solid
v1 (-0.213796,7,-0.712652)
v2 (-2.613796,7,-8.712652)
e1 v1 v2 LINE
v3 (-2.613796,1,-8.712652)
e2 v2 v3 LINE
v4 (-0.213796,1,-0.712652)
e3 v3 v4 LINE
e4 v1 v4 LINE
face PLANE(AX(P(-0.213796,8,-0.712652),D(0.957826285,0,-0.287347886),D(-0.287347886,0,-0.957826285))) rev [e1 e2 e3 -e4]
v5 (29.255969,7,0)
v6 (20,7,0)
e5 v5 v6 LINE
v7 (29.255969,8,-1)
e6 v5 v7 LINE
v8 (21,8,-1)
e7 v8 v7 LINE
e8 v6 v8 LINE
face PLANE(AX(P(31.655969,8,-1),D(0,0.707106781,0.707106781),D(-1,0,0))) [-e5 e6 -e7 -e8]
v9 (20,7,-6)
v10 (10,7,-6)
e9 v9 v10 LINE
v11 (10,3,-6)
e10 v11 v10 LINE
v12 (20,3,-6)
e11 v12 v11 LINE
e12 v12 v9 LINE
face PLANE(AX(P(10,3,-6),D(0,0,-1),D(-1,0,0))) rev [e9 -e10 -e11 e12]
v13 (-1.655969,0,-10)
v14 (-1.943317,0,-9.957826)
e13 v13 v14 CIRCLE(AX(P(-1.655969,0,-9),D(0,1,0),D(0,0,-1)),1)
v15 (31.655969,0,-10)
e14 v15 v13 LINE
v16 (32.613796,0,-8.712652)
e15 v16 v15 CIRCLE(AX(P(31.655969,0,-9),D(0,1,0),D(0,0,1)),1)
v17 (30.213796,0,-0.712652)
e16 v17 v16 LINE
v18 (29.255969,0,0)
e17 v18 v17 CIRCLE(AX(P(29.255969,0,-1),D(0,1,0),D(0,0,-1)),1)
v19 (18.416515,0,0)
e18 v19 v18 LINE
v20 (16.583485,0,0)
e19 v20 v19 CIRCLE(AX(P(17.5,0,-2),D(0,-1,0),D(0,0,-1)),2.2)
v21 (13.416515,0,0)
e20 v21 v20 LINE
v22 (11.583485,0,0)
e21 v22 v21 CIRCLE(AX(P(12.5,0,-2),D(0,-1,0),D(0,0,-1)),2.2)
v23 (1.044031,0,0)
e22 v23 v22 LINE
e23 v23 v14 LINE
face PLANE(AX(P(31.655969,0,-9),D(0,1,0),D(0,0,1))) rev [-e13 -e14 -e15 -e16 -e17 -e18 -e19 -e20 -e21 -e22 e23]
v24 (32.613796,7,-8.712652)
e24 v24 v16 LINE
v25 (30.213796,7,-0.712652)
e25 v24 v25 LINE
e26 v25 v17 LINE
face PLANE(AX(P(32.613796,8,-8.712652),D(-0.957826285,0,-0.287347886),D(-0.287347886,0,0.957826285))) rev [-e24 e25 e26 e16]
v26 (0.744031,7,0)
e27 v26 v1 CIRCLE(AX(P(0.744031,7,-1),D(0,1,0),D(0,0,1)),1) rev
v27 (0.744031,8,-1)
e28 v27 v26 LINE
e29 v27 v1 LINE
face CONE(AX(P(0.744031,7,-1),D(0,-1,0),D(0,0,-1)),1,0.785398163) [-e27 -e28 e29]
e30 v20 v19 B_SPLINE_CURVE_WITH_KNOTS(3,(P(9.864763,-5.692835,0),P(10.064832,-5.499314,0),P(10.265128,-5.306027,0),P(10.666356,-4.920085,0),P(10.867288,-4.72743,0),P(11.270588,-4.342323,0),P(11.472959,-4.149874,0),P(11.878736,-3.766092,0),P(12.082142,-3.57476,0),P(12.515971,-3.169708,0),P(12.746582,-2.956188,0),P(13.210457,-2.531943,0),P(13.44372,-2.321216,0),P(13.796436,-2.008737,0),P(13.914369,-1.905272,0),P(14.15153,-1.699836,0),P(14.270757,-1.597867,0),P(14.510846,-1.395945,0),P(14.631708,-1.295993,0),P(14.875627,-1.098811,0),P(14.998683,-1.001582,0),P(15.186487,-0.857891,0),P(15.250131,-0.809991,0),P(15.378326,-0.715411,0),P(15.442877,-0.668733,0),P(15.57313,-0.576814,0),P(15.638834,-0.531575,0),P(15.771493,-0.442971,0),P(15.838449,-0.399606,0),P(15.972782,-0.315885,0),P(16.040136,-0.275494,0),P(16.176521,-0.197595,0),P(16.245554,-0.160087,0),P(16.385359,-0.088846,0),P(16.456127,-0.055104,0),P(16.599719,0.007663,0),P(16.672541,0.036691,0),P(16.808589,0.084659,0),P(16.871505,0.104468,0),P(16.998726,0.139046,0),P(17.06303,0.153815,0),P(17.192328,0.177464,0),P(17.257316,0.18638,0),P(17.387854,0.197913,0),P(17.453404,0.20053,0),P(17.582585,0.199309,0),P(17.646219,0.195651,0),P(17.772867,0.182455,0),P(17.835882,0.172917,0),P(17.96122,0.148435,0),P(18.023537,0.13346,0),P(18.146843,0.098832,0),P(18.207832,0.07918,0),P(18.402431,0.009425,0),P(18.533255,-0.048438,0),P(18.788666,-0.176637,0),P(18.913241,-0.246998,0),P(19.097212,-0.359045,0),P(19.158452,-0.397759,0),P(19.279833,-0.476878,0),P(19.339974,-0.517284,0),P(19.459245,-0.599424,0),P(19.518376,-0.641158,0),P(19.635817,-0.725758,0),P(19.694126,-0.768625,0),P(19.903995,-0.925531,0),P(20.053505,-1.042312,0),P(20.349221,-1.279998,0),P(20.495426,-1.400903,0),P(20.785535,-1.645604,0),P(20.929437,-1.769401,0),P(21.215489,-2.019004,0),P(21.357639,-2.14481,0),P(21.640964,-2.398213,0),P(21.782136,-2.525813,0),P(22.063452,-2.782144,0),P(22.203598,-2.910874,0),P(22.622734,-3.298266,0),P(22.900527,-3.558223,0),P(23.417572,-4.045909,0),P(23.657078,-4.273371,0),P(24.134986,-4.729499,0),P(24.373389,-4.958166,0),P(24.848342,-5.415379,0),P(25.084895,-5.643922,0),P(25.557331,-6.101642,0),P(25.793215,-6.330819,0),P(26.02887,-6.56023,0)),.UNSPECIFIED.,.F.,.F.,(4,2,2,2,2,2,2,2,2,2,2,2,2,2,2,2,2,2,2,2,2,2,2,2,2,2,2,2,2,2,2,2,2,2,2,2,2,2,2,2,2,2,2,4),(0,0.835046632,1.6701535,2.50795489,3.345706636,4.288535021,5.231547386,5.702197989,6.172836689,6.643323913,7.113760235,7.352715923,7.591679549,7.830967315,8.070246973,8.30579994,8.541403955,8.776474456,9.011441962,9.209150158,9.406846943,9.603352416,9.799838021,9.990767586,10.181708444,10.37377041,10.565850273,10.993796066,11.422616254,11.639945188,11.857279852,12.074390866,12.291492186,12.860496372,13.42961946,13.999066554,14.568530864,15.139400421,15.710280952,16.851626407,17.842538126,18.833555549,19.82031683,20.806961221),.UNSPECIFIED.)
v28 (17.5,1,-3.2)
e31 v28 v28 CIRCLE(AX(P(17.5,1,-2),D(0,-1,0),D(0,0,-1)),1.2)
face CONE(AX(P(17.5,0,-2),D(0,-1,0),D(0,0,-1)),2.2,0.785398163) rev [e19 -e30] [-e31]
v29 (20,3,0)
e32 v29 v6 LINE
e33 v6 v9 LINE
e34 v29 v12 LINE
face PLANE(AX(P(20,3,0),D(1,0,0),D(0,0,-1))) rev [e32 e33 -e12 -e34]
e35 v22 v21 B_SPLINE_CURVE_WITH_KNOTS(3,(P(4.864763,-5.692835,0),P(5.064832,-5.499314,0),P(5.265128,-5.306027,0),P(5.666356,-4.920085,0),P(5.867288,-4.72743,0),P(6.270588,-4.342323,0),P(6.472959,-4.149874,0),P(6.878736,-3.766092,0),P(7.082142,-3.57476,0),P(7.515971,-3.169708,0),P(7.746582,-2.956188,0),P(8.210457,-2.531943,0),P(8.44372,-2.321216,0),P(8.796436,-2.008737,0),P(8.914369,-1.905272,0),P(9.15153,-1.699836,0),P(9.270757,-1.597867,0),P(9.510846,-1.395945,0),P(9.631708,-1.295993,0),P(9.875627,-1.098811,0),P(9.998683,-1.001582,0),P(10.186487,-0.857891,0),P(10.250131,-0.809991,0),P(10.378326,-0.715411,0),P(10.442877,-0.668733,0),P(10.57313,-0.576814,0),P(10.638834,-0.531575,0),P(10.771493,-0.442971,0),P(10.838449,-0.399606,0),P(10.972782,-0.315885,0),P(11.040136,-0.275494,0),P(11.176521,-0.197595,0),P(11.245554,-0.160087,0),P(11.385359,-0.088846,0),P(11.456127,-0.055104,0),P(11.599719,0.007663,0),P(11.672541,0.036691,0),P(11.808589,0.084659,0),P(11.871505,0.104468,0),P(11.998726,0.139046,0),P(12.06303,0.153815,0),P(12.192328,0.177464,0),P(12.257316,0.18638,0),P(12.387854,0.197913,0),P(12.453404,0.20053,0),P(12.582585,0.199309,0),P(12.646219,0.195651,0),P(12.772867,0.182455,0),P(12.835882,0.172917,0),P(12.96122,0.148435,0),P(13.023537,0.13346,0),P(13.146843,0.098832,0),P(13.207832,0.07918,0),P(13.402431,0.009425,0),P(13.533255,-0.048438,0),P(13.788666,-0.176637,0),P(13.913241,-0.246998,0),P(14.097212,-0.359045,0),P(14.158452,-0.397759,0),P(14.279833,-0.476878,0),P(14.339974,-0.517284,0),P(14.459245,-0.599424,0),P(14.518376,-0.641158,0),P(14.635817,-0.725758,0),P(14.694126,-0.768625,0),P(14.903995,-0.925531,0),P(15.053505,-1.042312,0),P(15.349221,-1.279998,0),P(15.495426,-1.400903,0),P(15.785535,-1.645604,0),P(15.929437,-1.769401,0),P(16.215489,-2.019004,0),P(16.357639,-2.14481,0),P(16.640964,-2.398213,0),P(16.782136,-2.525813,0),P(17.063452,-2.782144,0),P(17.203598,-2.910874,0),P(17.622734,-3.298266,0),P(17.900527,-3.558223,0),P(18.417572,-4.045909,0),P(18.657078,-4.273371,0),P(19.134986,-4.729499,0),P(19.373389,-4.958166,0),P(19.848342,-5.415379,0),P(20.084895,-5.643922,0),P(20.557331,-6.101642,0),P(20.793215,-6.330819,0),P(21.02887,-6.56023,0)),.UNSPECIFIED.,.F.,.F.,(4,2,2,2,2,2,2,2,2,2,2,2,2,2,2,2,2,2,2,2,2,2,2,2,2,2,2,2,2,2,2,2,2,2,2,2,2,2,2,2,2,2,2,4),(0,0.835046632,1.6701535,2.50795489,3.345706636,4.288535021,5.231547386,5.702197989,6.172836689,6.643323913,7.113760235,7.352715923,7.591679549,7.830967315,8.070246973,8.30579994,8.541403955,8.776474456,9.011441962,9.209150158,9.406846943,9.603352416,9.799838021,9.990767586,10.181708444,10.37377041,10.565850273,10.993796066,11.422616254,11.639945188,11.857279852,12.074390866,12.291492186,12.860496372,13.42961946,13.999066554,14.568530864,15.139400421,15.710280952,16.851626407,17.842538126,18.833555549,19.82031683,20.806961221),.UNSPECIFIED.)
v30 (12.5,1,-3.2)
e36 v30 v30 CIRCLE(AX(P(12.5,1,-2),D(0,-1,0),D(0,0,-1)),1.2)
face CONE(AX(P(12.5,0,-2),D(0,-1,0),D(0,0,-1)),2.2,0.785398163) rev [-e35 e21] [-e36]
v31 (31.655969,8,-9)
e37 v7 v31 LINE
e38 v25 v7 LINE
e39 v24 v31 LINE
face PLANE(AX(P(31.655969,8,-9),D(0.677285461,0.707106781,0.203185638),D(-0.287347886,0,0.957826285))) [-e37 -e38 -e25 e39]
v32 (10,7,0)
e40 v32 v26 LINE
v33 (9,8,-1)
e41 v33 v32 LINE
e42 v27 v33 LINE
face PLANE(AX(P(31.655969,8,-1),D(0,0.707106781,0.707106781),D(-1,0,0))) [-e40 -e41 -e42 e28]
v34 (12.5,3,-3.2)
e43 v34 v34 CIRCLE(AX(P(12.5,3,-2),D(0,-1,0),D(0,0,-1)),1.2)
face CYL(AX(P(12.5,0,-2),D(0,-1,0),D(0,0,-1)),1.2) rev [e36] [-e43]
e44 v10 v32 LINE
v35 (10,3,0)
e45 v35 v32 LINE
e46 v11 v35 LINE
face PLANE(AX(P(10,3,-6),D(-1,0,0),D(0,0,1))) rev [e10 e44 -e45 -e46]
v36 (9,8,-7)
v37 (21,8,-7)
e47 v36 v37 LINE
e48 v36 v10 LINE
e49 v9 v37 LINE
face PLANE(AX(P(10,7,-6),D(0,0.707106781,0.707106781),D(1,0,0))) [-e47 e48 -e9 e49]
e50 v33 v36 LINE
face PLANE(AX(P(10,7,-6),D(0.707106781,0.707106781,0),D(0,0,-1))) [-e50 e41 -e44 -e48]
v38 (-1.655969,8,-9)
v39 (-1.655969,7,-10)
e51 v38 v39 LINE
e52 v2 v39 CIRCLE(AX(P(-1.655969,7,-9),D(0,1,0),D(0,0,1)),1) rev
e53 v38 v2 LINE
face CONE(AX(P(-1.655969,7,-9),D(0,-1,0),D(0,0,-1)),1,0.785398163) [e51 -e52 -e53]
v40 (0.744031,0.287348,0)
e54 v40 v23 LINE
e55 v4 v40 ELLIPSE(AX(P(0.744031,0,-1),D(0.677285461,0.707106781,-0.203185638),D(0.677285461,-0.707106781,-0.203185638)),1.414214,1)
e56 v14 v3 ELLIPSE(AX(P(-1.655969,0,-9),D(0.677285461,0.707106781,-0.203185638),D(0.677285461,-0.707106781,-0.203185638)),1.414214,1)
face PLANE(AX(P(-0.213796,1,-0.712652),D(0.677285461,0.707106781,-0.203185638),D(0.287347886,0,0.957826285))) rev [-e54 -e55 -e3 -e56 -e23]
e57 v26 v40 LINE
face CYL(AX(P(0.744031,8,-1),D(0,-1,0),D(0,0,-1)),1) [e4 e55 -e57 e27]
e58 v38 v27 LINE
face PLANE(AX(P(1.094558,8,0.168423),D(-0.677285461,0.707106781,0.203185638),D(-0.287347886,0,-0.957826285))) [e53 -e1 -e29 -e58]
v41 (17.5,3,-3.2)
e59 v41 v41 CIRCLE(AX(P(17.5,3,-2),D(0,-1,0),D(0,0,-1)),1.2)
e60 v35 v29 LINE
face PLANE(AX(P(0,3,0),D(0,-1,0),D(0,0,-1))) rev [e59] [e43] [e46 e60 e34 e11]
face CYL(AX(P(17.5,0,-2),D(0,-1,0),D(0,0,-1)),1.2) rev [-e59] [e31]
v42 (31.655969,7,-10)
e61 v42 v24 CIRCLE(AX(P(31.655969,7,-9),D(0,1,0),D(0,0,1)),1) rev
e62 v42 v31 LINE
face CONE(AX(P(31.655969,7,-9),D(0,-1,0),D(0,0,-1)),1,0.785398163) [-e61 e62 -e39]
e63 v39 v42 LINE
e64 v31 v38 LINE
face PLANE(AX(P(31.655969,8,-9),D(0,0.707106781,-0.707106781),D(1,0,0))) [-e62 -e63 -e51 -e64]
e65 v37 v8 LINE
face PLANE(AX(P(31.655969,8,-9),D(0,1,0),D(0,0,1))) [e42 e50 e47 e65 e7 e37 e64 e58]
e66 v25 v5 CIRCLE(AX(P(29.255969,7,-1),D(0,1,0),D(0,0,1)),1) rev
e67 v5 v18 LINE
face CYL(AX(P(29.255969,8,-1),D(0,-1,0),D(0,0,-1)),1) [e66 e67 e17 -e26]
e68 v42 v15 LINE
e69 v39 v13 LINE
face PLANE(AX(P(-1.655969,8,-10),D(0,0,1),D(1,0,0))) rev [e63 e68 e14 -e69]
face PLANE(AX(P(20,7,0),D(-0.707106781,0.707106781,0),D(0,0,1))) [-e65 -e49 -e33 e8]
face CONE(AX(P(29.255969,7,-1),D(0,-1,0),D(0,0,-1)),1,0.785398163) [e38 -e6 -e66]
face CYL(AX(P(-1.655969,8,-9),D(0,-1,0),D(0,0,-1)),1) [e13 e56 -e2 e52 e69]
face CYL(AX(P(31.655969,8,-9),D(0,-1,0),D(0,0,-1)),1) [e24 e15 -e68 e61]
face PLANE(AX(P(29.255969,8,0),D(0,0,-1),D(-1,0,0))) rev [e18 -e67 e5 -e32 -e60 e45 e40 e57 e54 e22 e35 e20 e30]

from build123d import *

# Parameters (mm, degrees)
RESSALTO_EXTRUS_O2_DEPTH                             = 8
ESBO_O5_W                                            = 10
ESBO_O5_H                                            = 6
CORTE_EXTRUS_O1_DEPTH                                = 5
ESCAREADO_PARA_PARAFUSO_COM_CABE_A_ESCAR_D           = 2.4
ESCAREADO_PARA_PARAFUSO_COM_CABE_A_ESCAR_CSINK_D     = 4.4
ESCAREADO_PARA_PARAFUSO_COM_CABE_A_ESCAR_CSINK_ANGLE = 90
CHANFRO1_SIZE                                        = 1


with BuildPart() as part:
    # Esboço2 → Ressalto-extrusão2 (new body)
    with BuildSketch(Plane(origin=(0, 0, 0), x_dir=(1, 0, 0), z_dir=(0, 1, 0))):
        with BuildLine():
            Line((-0.213795634, 0.712652114), (-2.613795634, 8.712652114))
            ThreePointArc((-2.613795634, 8.712652114), (-2.458262277, 9.59693053), (-1.655969349, 10))
            Line((-1.655969349, 10), (31.655969349, 10))
            ThreePointArc((31.655969349, 10), (32.458262277, 9.59693053), (32.613795634, 8.712652114))
            Line((32.613795634, 8.712652114), (30.213795634, 0.712652114))
            ThreePointArc((30.213795634, 0.712652114), (29.852899879, 0.197707072), (29.255969349, 0))
            Line((29.255969349, 0), (0.744030651, 0))
            ThreePointArc((0.744030651, 0), (0.147100121, 0.197707072), (-0.213795634, 0.712652114))
        make_face()
    extrude(amount=RESSALTO_EXTRUS_O2_DEPTH)

    # Esboço5 → Corte-extrusão1 (cut)
    with BuildSketch(Plane(origin=(0, 8, 0), x_dir=(1, 0, 0), z_dir=(0, 1, 0))):
        with Locations((15, 3)):
            Rectangle(ESBO_O5_W, ESBO_O5_H)
    extrude(amount=-CORTE_EXTRUS_O1_DEPTH, mode=Mode.SUBTRACT)

    # Escareado para parafuso com cabeça escareada chata de M21 (through all)
    with Locations(Plane(origin=(17.5, 0, -2), x_dir=(0, 0, -1), z_dir=(0, -1, 0))):
        with Locations((0, 0), (0, -5)):
            CounterSinkHole(ESCAREADO_PARA_PARAFUSO_COM_CABE_A_ESCAR_D / 2, ESCAREADO_PARA_PARAFUSO_COM_CABE_A_ESCAR_CSINK_D / 2, counter_sink_angle=ESCAREADO_PARA_PARAFUSO_COM_CABE_A_ESCAR_CSINK_ANGLE)

    # Chanfro1
    # the kernel refuses this chamfer: 1 mm, written as the material it takes off along each edge
    with BuildSketch(Plane(origin=(10, 8, -6), x_dir=(0, 0, -1), z_dir=(1, 0, 0))) as chanfro1_piece_1:
        Polygon((CHANFRO1_SIZE, 0), (0, -CHANFRO1_SIZE), (0, 0), align=None)
    extrude(amount=10, mode=Mode.SUBTRACT)
    with BuildSketch(Plane(origin=(10, 8, 2.571682988), x_dir=(-1, 0, 0), z_dir=(0, 0, -1)), Plane(origin=(20, 8, -6), x_dir=(1, 0, 0), z_dir=(0, 0, 1))) as chanfro1_piece_2:
        Polygon((CHANFRO1_SIZE, 0), (0, -CHANFRO1_SIZE), (0, 0), align=None)
    extrude(amount=8.571682988, mode=Mode.SUBTRACT)
    with BuildSketch(Plane(origin=(12.571682988, 8, 0), x_dir=(0, 0, -1), z_dir=(-1, 0, 0)), Plane(origin=(29.255969349, 8, 0), x_dir=(0, 0, -1), z_dir=(-1, 0, 0))) as chanfro1_piece_3:
        Polygon((CHANFRO1_SIZE, 0), (0, CHANFRO1_SIZE), (0, 0), align=None)
    extrude(amount=11.827652337, mode=Mode.SUBTRACT)
    with BuildSketch(Plane(origin=(0.744030651, 8, -1), x_dir=(0, 0, 1), z_dir=(1, 0, 0))) as chanfro1_piece_4:
        Polygon((1 - CHANFRO1_SIZE, 0), (1, CHANFRO1_SIZE), (1, 0), align=None)
    revolve(axis=Axis((0.744030651, 8, -1), (0, -1, 0)), revolution_arc=73.300755766, mode=Mode.SUBTRACT)
    with BuildSketch(Plane(origin=(-0.213795634, 8, -0.712652114), x_dir=(0, -1, 0), z_dir=(-0.28734788556634544, 0, -0.9578262852211514))) as chanfro1_piece_5:
        Polygon((CHANFRO1_SIZE, 0), (0, -CHANFRO1_SIZE), (0, 0), align=None)
    extrude(amount=8.352245207, mode=Mode.SUBTRACT)
    with BuildSketch(Plane(origin=(-1.655969349, 8, -9), x_dir=(-0.957826285221151, 0, 0.2873478855663471), z_dir=(0.2873478855663471, 0, 0.957826285221151))) as chanfro1_piece_6:
        Polygon((1 - CHANFRO1_SIZE, 0), (1, CHANFRO1_SIZE), (1, 0), align=None)
    revolve(axis=Axis((-1.655969349, 8, -9), (0, -1, 0)), revolution_arc=106.699244234, mode=Mode.SUBTRACT)
    with BuildSketch(Plane(origin=(-1.655969349, 8, -10), x_dir=(0, 0, 1), z_dir=(1, 0, 0))) as chanfro1_piece_7:
        Polygon((CHANFRO1_SIZE, 0), (0, CHANFRO1_SIZE), (0, 0), align=None)
    extrude(amount=33.311938698, mode=Mode.SUBTRACT)
    with BuildSketch(Plane(origin=(31.655969349, 8, -9), x_dir=(0, 0, -1), z_dir=(-1, 0, 0))) as chanfro1_piece_8:
        Polygon((1 - CHANFRO1_SIZE, 0), (1, CHANFRO1_SIZE), (1, 0), align=None)
    revolve(axis=Axis((31.655969349, 8, -9), (0, -1, 0)), revolution_arc=106.699244234, mode=Mode.SUBTRACT)
    with BuildSketch(Plane(origin=(32.613795634, 8, -8.712652114), x_dir=(-0.9578262852211513, 0, -0.2873478855663455), z_dir=(-0.28734788556634555, 0, 0.9578262852211514))) as chanfro1_piece_9:
        Polygon((CHANFRO1_SIZE, 0), (0, CHANFRO1_SIZE), (0, 0), align=None)
    extrude(amount=8.352245207, mode=Mode.SUBTRACT)
    with BuildSketch(Plane(origin=(29.255969349, 8, -1), x_dir=(0.9578262852211534, 0, 0.2873478855663385), z_dir=(0.2873478855663385, 0, -0.9578262852211534))) as chanfro1_piece_10:
        Polygon((1 - CHANFRO1_SIZE, 0), (1, CHANFRO1_SIZE), (1, 0), align=None)
    revolve(axis=Axis((29.255969349, 8, -1), (0, -1, 0)), revolution_arc=73.300755766, mode=Mode.SUBTRACT)
    with BuildSketch(Plane(origin=(0.525172035, 0, 1.750573449), x_dir=(0, 1, 0), z_dir=(-0.28734788556634544, 0, -0.9578262852211514))) as chanfro1_piece_11:
        Polygon((CHANFRO1_SIZE, 0), (0, CHANFRO1_SIZE), (0, 0), align=None)
    extrude(amount=13.495611183, mode=Mode.SUBTRACT)
    with BuildSketch(Plane(origin=(10, 8, 0), x_dir=(-1, 0, 0), z_dir=(0, 0, -1))) as chanfro1_piece_12a_section:
        Polygon((CHANFRO1_SIZE, 0), (0, -CHANFRO1_SIZE), (0, 0), align=None)
    chanfro1_piece_12a = extrude(amount=8.571682988, mode=Mode.PRIVATE)
    chanfro1_piece_12a = split(chanfro1_piece_12a, bisect_by=Plane(origin=(10, 8, -6), z_dir=(0, 0, -1)), keep=Keep.TOP, mode=Mode.PRIVATE)
    with BuildSketch(Plane(origin=(7.428317012, 8, -6), x_dir=(0, 0, -1), z_dir=(1, 0, 0))) as chanfro1_piece_12b_section:
        Polygon((CHANFRO1_SIZE, 0), (0, -CHANFRO1_SIZE), (0, 0), align=None)
    chanfro1_piece_12b = extrude(amount=12.571682988, mode=Mode.PRIVATE)
    chanfro1_piece_12b = split(chanfro1_piece_12b, bisect_by=Plane(origin=(10, 8, -6), z_dir=(-1, 0, 0)), keep=Keep.TOP, mode=Mode.PRIVATE)
    chanfro1_piece_12 = chanfro1_piece_12a & chanfro1_piece_12b
    add(chanfro1_piece_12, mode=Mode.SUBTRACT)
    with BuildSketch(Plane(origin=(10, 8, -6), x_dir=(0, 0, -1), z_dir=(1, 0, 0))) as chanfro1_piece_13a_section:
        Polygon((CHANFRO1_SIZE, 0), (0, -CHANFRO1_SIZE), (0, 0), align=None)
    chanfro1_piece_13a = extrude(amount=12.571682988, mode=Mode.PRIVATE)
    chanfro1_piece_13a = split(chanfro1_piece_13a, bisect_by=Plane(origin=(20, 8, -6), z_dir=(1, 0, 0)), keep=Keep.TOP, mode=Mode.PRIVATE)
    with BuildSketch(Plane(origin=(20, 8, -8.571682988), x_dir=(1, 0, 0), z_dir=(0, 0, 1))) as chanfro1_piece_13b_section:
        Polygon((CHANFRO1_SIZE, 0), (0, -CHANFRO1_SIZE), (0, 0), align=None)
    chanfro1_piece_13b = extrude(amount=8.571682988, mode=Mode.PRIVATE)
    chanfro1_piece_13b = split(chanfro1_piece_13b, bisect_by=Plane(origin=(20, 8, -6), z_dir=(0, 0, -1)), keep=Keep.TOP, mode=Mode.PRIVATE)
    chanfro1_piece_13 = chanfro1_piece_13a & chanfro1_piece_13b
    add(chanfro1_piece_13, mode=Mode.SUBTRACT)


solid = part.part
